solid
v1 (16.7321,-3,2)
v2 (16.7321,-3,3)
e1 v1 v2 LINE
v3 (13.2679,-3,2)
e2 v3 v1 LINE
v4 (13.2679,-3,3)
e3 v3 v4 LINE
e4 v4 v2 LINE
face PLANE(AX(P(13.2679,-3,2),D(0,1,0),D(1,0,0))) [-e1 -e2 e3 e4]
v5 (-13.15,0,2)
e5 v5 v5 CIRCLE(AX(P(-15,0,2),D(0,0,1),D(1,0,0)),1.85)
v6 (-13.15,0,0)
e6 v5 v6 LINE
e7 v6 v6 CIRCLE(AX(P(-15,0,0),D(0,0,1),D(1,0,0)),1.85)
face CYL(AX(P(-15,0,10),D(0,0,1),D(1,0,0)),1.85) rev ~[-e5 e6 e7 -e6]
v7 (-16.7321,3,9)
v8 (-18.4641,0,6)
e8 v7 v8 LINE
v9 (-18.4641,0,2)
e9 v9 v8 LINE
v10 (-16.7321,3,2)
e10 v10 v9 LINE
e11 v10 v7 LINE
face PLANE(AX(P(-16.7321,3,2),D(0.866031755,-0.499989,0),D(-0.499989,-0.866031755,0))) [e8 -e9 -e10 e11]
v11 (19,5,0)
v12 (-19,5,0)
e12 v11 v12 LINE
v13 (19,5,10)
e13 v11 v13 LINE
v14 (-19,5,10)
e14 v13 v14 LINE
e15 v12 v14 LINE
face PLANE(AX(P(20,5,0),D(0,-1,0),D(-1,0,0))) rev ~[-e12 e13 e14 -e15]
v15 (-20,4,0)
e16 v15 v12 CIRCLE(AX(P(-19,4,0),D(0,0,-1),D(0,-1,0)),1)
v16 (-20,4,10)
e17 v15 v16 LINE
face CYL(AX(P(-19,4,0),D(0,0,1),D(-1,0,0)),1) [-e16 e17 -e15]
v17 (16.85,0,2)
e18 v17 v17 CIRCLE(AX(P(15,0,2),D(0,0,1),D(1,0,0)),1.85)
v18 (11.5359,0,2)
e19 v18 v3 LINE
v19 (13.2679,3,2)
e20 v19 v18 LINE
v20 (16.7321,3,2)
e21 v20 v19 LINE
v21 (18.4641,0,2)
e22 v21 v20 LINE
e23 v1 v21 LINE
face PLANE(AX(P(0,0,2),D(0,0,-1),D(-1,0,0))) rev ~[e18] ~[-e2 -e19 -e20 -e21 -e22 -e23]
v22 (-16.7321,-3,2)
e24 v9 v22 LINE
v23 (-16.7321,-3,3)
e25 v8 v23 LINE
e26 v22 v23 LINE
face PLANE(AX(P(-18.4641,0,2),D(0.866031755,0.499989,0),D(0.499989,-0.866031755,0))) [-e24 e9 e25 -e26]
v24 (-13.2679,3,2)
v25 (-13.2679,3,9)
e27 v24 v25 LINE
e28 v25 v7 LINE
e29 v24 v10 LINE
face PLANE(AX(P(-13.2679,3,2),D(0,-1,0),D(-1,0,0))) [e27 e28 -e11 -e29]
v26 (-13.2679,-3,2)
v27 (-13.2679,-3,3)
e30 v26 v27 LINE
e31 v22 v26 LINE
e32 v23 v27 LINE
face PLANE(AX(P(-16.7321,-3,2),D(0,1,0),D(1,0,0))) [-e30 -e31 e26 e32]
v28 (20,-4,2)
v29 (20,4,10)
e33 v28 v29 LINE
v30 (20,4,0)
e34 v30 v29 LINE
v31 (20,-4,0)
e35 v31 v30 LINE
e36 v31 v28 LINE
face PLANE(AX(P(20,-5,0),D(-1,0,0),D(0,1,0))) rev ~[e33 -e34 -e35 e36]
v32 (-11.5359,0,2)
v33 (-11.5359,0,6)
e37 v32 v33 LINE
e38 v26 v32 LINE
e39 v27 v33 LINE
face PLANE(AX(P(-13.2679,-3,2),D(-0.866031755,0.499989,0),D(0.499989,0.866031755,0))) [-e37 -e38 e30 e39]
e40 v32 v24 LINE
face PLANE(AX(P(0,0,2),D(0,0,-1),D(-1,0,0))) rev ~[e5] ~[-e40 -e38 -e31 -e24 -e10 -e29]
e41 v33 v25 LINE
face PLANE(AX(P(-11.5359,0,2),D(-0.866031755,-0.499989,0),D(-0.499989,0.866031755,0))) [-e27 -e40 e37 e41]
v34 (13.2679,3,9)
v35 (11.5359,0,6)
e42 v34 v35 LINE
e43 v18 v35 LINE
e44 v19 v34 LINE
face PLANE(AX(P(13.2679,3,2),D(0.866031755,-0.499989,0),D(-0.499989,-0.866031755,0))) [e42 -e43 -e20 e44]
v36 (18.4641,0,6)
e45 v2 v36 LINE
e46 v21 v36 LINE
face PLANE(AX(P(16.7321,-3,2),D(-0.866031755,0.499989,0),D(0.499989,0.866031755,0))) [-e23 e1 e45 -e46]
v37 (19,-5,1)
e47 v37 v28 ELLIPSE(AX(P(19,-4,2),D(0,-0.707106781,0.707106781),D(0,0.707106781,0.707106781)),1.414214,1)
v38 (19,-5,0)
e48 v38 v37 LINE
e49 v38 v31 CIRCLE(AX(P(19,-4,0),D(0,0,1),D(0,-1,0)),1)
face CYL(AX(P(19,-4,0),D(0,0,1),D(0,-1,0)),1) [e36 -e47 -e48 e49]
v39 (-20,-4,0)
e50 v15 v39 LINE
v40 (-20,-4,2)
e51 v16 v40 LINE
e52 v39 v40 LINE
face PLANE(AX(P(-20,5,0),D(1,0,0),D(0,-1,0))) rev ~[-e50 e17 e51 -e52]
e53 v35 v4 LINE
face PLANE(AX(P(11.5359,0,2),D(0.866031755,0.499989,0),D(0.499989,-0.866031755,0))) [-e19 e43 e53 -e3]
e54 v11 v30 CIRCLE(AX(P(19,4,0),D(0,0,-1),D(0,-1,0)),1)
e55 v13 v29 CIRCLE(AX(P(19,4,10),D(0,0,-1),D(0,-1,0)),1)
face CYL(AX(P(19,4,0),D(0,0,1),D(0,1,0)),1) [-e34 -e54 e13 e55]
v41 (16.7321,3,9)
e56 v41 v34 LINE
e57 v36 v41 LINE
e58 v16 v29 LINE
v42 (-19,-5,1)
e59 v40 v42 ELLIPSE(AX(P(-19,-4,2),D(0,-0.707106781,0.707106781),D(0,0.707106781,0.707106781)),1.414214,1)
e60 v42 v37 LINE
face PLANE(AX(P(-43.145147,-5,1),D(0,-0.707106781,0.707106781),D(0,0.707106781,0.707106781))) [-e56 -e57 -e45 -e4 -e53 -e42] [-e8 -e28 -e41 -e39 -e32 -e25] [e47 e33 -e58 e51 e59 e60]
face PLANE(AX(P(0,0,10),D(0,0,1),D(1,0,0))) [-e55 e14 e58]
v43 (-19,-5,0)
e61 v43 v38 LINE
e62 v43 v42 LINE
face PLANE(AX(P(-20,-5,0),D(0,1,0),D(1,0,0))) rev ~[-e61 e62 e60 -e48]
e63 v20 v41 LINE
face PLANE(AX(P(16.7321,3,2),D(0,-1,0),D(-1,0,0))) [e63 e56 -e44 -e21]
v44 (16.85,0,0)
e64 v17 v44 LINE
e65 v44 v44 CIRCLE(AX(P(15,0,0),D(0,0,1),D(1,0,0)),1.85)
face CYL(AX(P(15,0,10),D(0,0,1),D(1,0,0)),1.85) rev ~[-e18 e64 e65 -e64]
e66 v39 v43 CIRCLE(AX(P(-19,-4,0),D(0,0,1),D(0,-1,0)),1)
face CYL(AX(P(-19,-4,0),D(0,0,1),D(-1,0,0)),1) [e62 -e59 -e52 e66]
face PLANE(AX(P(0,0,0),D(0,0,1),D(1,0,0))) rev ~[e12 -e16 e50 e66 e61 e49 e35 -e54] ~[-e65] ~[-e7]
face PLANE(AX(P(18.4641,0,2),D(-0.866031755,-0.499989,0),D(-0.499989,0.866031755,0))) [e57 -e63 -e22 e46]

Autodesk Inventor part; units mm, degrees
ref_plane "YZ Plane" through (0, 0, 0) normal (1, 0, 0) x (0, 1, 0)
ref_plane "XZ Plane" through (0, 0, 0) normal (0, 1, 0) x (-1, 0, 0)
sketch "Sketch1" plane through (0, 0, 0) normal (0, 0, 1) x (1, 0, 0)
  line L0 (-20, -5) -> (20, -5)
  line L1 (20, -5) -> (20, 5)
  line L2 (20, 5) -> (-20, 5)
  line L3 (-20, 5) -> (-20, -5)
  line L4 (-20, -5) -> (20, 5) construction
  line L5 (20, -5) -> (-20, 5) construction
  point P0 (0, 0)
  dimension "d0" = 10
  dimension "d1" = 40
extrude "Extrusion1" add sketch "Sketch1" along normal blind 10
sketch "Sketch2" plane through (0, 0, 10) normal (0, 0, 1) x (1, 0, 0)
  line L0 (-28, 0) -> (28, 0) projected
  circle A0 centre (-15, 0) radius 1.85
  circle A1 centre (15, 0) radius 1.85
  point P0 (0, 0)
  point P1 (16.85, 0)
  point P2 (13.15, 0)
  dimension "d4" = 3.7
  dimension "d5" = 3.7
  dimension "d6" = 15
  dimension "d7" = 15
extrude "Extrusion2" cut sketch "Sketch2" against normal through all
chamfer "Chamfer1" distance 9 angle 45 1 edges at (0, -5, 10)
ref_plane "Work Plane1" through (0, 0, 2) normal (0, 0, -1) x (-1, 0, 0)
sketch "Sketch3" plane through (0, 0, 2) normal (0, 0, -1) x (-1, 0, 0)
  circle A0 centre (15, 0) radius 1.85 projected
  circle A1 centre (-15, 0) radius 1.85 projected
  line L0 (11.5359, 0) -> (13.2679, 3)
  line L1 (13.2679, 3) -> (16.7321, 3)
  line L2 (16.7321, 3) -> (18.4641, 0)
  line L3 (18.4641, 0) -> (16.7321, -3)
  line L4 (16.7321, -3) -> (13.2679, -3)
  line L5 (13.2679, -3) -> (11.5359, 0)
  line L6 (-18.4641, 0) -> (-16.7321, 3)
  line L7 (-16.7321, 3) -> (-13.2679, 3)
  line L8 (-13.2679, 3) -> (-11.5359, 0)
  line L9 (-11.5359, 0) -> (-13.2679, -3)
  line L10 (-13.2679, -3) -> (-16.7321, -3)
  line L11 (-16.7321, -3) -> (-18.4641, 0)
  point P0 (0, 0)
  point P1 (15, 3)
  dimension "d14" = 6
  dimension "d15" = 6
extrude "Extrusion3" cut sketch "Sketch3" against normal up to surface contours A1 | L0 L1 L2 L3 L4 L5 | L6 L7 L8 L9 L10 L11 surface through (-10, -0.5, 5.5) normal (0, -0.7071068, 0.7071068)
fillet "Fillet1" radius 1 4 edges at (20, 5, 5) (20, -5, 0.5) (-20, 5, 5) (-20, -5, 0.5)
equation "\"d5\" = d4"
equation "\"d7\" = d6"
equation "\"d15\" = d14"
properties part number "_3DPrint"
